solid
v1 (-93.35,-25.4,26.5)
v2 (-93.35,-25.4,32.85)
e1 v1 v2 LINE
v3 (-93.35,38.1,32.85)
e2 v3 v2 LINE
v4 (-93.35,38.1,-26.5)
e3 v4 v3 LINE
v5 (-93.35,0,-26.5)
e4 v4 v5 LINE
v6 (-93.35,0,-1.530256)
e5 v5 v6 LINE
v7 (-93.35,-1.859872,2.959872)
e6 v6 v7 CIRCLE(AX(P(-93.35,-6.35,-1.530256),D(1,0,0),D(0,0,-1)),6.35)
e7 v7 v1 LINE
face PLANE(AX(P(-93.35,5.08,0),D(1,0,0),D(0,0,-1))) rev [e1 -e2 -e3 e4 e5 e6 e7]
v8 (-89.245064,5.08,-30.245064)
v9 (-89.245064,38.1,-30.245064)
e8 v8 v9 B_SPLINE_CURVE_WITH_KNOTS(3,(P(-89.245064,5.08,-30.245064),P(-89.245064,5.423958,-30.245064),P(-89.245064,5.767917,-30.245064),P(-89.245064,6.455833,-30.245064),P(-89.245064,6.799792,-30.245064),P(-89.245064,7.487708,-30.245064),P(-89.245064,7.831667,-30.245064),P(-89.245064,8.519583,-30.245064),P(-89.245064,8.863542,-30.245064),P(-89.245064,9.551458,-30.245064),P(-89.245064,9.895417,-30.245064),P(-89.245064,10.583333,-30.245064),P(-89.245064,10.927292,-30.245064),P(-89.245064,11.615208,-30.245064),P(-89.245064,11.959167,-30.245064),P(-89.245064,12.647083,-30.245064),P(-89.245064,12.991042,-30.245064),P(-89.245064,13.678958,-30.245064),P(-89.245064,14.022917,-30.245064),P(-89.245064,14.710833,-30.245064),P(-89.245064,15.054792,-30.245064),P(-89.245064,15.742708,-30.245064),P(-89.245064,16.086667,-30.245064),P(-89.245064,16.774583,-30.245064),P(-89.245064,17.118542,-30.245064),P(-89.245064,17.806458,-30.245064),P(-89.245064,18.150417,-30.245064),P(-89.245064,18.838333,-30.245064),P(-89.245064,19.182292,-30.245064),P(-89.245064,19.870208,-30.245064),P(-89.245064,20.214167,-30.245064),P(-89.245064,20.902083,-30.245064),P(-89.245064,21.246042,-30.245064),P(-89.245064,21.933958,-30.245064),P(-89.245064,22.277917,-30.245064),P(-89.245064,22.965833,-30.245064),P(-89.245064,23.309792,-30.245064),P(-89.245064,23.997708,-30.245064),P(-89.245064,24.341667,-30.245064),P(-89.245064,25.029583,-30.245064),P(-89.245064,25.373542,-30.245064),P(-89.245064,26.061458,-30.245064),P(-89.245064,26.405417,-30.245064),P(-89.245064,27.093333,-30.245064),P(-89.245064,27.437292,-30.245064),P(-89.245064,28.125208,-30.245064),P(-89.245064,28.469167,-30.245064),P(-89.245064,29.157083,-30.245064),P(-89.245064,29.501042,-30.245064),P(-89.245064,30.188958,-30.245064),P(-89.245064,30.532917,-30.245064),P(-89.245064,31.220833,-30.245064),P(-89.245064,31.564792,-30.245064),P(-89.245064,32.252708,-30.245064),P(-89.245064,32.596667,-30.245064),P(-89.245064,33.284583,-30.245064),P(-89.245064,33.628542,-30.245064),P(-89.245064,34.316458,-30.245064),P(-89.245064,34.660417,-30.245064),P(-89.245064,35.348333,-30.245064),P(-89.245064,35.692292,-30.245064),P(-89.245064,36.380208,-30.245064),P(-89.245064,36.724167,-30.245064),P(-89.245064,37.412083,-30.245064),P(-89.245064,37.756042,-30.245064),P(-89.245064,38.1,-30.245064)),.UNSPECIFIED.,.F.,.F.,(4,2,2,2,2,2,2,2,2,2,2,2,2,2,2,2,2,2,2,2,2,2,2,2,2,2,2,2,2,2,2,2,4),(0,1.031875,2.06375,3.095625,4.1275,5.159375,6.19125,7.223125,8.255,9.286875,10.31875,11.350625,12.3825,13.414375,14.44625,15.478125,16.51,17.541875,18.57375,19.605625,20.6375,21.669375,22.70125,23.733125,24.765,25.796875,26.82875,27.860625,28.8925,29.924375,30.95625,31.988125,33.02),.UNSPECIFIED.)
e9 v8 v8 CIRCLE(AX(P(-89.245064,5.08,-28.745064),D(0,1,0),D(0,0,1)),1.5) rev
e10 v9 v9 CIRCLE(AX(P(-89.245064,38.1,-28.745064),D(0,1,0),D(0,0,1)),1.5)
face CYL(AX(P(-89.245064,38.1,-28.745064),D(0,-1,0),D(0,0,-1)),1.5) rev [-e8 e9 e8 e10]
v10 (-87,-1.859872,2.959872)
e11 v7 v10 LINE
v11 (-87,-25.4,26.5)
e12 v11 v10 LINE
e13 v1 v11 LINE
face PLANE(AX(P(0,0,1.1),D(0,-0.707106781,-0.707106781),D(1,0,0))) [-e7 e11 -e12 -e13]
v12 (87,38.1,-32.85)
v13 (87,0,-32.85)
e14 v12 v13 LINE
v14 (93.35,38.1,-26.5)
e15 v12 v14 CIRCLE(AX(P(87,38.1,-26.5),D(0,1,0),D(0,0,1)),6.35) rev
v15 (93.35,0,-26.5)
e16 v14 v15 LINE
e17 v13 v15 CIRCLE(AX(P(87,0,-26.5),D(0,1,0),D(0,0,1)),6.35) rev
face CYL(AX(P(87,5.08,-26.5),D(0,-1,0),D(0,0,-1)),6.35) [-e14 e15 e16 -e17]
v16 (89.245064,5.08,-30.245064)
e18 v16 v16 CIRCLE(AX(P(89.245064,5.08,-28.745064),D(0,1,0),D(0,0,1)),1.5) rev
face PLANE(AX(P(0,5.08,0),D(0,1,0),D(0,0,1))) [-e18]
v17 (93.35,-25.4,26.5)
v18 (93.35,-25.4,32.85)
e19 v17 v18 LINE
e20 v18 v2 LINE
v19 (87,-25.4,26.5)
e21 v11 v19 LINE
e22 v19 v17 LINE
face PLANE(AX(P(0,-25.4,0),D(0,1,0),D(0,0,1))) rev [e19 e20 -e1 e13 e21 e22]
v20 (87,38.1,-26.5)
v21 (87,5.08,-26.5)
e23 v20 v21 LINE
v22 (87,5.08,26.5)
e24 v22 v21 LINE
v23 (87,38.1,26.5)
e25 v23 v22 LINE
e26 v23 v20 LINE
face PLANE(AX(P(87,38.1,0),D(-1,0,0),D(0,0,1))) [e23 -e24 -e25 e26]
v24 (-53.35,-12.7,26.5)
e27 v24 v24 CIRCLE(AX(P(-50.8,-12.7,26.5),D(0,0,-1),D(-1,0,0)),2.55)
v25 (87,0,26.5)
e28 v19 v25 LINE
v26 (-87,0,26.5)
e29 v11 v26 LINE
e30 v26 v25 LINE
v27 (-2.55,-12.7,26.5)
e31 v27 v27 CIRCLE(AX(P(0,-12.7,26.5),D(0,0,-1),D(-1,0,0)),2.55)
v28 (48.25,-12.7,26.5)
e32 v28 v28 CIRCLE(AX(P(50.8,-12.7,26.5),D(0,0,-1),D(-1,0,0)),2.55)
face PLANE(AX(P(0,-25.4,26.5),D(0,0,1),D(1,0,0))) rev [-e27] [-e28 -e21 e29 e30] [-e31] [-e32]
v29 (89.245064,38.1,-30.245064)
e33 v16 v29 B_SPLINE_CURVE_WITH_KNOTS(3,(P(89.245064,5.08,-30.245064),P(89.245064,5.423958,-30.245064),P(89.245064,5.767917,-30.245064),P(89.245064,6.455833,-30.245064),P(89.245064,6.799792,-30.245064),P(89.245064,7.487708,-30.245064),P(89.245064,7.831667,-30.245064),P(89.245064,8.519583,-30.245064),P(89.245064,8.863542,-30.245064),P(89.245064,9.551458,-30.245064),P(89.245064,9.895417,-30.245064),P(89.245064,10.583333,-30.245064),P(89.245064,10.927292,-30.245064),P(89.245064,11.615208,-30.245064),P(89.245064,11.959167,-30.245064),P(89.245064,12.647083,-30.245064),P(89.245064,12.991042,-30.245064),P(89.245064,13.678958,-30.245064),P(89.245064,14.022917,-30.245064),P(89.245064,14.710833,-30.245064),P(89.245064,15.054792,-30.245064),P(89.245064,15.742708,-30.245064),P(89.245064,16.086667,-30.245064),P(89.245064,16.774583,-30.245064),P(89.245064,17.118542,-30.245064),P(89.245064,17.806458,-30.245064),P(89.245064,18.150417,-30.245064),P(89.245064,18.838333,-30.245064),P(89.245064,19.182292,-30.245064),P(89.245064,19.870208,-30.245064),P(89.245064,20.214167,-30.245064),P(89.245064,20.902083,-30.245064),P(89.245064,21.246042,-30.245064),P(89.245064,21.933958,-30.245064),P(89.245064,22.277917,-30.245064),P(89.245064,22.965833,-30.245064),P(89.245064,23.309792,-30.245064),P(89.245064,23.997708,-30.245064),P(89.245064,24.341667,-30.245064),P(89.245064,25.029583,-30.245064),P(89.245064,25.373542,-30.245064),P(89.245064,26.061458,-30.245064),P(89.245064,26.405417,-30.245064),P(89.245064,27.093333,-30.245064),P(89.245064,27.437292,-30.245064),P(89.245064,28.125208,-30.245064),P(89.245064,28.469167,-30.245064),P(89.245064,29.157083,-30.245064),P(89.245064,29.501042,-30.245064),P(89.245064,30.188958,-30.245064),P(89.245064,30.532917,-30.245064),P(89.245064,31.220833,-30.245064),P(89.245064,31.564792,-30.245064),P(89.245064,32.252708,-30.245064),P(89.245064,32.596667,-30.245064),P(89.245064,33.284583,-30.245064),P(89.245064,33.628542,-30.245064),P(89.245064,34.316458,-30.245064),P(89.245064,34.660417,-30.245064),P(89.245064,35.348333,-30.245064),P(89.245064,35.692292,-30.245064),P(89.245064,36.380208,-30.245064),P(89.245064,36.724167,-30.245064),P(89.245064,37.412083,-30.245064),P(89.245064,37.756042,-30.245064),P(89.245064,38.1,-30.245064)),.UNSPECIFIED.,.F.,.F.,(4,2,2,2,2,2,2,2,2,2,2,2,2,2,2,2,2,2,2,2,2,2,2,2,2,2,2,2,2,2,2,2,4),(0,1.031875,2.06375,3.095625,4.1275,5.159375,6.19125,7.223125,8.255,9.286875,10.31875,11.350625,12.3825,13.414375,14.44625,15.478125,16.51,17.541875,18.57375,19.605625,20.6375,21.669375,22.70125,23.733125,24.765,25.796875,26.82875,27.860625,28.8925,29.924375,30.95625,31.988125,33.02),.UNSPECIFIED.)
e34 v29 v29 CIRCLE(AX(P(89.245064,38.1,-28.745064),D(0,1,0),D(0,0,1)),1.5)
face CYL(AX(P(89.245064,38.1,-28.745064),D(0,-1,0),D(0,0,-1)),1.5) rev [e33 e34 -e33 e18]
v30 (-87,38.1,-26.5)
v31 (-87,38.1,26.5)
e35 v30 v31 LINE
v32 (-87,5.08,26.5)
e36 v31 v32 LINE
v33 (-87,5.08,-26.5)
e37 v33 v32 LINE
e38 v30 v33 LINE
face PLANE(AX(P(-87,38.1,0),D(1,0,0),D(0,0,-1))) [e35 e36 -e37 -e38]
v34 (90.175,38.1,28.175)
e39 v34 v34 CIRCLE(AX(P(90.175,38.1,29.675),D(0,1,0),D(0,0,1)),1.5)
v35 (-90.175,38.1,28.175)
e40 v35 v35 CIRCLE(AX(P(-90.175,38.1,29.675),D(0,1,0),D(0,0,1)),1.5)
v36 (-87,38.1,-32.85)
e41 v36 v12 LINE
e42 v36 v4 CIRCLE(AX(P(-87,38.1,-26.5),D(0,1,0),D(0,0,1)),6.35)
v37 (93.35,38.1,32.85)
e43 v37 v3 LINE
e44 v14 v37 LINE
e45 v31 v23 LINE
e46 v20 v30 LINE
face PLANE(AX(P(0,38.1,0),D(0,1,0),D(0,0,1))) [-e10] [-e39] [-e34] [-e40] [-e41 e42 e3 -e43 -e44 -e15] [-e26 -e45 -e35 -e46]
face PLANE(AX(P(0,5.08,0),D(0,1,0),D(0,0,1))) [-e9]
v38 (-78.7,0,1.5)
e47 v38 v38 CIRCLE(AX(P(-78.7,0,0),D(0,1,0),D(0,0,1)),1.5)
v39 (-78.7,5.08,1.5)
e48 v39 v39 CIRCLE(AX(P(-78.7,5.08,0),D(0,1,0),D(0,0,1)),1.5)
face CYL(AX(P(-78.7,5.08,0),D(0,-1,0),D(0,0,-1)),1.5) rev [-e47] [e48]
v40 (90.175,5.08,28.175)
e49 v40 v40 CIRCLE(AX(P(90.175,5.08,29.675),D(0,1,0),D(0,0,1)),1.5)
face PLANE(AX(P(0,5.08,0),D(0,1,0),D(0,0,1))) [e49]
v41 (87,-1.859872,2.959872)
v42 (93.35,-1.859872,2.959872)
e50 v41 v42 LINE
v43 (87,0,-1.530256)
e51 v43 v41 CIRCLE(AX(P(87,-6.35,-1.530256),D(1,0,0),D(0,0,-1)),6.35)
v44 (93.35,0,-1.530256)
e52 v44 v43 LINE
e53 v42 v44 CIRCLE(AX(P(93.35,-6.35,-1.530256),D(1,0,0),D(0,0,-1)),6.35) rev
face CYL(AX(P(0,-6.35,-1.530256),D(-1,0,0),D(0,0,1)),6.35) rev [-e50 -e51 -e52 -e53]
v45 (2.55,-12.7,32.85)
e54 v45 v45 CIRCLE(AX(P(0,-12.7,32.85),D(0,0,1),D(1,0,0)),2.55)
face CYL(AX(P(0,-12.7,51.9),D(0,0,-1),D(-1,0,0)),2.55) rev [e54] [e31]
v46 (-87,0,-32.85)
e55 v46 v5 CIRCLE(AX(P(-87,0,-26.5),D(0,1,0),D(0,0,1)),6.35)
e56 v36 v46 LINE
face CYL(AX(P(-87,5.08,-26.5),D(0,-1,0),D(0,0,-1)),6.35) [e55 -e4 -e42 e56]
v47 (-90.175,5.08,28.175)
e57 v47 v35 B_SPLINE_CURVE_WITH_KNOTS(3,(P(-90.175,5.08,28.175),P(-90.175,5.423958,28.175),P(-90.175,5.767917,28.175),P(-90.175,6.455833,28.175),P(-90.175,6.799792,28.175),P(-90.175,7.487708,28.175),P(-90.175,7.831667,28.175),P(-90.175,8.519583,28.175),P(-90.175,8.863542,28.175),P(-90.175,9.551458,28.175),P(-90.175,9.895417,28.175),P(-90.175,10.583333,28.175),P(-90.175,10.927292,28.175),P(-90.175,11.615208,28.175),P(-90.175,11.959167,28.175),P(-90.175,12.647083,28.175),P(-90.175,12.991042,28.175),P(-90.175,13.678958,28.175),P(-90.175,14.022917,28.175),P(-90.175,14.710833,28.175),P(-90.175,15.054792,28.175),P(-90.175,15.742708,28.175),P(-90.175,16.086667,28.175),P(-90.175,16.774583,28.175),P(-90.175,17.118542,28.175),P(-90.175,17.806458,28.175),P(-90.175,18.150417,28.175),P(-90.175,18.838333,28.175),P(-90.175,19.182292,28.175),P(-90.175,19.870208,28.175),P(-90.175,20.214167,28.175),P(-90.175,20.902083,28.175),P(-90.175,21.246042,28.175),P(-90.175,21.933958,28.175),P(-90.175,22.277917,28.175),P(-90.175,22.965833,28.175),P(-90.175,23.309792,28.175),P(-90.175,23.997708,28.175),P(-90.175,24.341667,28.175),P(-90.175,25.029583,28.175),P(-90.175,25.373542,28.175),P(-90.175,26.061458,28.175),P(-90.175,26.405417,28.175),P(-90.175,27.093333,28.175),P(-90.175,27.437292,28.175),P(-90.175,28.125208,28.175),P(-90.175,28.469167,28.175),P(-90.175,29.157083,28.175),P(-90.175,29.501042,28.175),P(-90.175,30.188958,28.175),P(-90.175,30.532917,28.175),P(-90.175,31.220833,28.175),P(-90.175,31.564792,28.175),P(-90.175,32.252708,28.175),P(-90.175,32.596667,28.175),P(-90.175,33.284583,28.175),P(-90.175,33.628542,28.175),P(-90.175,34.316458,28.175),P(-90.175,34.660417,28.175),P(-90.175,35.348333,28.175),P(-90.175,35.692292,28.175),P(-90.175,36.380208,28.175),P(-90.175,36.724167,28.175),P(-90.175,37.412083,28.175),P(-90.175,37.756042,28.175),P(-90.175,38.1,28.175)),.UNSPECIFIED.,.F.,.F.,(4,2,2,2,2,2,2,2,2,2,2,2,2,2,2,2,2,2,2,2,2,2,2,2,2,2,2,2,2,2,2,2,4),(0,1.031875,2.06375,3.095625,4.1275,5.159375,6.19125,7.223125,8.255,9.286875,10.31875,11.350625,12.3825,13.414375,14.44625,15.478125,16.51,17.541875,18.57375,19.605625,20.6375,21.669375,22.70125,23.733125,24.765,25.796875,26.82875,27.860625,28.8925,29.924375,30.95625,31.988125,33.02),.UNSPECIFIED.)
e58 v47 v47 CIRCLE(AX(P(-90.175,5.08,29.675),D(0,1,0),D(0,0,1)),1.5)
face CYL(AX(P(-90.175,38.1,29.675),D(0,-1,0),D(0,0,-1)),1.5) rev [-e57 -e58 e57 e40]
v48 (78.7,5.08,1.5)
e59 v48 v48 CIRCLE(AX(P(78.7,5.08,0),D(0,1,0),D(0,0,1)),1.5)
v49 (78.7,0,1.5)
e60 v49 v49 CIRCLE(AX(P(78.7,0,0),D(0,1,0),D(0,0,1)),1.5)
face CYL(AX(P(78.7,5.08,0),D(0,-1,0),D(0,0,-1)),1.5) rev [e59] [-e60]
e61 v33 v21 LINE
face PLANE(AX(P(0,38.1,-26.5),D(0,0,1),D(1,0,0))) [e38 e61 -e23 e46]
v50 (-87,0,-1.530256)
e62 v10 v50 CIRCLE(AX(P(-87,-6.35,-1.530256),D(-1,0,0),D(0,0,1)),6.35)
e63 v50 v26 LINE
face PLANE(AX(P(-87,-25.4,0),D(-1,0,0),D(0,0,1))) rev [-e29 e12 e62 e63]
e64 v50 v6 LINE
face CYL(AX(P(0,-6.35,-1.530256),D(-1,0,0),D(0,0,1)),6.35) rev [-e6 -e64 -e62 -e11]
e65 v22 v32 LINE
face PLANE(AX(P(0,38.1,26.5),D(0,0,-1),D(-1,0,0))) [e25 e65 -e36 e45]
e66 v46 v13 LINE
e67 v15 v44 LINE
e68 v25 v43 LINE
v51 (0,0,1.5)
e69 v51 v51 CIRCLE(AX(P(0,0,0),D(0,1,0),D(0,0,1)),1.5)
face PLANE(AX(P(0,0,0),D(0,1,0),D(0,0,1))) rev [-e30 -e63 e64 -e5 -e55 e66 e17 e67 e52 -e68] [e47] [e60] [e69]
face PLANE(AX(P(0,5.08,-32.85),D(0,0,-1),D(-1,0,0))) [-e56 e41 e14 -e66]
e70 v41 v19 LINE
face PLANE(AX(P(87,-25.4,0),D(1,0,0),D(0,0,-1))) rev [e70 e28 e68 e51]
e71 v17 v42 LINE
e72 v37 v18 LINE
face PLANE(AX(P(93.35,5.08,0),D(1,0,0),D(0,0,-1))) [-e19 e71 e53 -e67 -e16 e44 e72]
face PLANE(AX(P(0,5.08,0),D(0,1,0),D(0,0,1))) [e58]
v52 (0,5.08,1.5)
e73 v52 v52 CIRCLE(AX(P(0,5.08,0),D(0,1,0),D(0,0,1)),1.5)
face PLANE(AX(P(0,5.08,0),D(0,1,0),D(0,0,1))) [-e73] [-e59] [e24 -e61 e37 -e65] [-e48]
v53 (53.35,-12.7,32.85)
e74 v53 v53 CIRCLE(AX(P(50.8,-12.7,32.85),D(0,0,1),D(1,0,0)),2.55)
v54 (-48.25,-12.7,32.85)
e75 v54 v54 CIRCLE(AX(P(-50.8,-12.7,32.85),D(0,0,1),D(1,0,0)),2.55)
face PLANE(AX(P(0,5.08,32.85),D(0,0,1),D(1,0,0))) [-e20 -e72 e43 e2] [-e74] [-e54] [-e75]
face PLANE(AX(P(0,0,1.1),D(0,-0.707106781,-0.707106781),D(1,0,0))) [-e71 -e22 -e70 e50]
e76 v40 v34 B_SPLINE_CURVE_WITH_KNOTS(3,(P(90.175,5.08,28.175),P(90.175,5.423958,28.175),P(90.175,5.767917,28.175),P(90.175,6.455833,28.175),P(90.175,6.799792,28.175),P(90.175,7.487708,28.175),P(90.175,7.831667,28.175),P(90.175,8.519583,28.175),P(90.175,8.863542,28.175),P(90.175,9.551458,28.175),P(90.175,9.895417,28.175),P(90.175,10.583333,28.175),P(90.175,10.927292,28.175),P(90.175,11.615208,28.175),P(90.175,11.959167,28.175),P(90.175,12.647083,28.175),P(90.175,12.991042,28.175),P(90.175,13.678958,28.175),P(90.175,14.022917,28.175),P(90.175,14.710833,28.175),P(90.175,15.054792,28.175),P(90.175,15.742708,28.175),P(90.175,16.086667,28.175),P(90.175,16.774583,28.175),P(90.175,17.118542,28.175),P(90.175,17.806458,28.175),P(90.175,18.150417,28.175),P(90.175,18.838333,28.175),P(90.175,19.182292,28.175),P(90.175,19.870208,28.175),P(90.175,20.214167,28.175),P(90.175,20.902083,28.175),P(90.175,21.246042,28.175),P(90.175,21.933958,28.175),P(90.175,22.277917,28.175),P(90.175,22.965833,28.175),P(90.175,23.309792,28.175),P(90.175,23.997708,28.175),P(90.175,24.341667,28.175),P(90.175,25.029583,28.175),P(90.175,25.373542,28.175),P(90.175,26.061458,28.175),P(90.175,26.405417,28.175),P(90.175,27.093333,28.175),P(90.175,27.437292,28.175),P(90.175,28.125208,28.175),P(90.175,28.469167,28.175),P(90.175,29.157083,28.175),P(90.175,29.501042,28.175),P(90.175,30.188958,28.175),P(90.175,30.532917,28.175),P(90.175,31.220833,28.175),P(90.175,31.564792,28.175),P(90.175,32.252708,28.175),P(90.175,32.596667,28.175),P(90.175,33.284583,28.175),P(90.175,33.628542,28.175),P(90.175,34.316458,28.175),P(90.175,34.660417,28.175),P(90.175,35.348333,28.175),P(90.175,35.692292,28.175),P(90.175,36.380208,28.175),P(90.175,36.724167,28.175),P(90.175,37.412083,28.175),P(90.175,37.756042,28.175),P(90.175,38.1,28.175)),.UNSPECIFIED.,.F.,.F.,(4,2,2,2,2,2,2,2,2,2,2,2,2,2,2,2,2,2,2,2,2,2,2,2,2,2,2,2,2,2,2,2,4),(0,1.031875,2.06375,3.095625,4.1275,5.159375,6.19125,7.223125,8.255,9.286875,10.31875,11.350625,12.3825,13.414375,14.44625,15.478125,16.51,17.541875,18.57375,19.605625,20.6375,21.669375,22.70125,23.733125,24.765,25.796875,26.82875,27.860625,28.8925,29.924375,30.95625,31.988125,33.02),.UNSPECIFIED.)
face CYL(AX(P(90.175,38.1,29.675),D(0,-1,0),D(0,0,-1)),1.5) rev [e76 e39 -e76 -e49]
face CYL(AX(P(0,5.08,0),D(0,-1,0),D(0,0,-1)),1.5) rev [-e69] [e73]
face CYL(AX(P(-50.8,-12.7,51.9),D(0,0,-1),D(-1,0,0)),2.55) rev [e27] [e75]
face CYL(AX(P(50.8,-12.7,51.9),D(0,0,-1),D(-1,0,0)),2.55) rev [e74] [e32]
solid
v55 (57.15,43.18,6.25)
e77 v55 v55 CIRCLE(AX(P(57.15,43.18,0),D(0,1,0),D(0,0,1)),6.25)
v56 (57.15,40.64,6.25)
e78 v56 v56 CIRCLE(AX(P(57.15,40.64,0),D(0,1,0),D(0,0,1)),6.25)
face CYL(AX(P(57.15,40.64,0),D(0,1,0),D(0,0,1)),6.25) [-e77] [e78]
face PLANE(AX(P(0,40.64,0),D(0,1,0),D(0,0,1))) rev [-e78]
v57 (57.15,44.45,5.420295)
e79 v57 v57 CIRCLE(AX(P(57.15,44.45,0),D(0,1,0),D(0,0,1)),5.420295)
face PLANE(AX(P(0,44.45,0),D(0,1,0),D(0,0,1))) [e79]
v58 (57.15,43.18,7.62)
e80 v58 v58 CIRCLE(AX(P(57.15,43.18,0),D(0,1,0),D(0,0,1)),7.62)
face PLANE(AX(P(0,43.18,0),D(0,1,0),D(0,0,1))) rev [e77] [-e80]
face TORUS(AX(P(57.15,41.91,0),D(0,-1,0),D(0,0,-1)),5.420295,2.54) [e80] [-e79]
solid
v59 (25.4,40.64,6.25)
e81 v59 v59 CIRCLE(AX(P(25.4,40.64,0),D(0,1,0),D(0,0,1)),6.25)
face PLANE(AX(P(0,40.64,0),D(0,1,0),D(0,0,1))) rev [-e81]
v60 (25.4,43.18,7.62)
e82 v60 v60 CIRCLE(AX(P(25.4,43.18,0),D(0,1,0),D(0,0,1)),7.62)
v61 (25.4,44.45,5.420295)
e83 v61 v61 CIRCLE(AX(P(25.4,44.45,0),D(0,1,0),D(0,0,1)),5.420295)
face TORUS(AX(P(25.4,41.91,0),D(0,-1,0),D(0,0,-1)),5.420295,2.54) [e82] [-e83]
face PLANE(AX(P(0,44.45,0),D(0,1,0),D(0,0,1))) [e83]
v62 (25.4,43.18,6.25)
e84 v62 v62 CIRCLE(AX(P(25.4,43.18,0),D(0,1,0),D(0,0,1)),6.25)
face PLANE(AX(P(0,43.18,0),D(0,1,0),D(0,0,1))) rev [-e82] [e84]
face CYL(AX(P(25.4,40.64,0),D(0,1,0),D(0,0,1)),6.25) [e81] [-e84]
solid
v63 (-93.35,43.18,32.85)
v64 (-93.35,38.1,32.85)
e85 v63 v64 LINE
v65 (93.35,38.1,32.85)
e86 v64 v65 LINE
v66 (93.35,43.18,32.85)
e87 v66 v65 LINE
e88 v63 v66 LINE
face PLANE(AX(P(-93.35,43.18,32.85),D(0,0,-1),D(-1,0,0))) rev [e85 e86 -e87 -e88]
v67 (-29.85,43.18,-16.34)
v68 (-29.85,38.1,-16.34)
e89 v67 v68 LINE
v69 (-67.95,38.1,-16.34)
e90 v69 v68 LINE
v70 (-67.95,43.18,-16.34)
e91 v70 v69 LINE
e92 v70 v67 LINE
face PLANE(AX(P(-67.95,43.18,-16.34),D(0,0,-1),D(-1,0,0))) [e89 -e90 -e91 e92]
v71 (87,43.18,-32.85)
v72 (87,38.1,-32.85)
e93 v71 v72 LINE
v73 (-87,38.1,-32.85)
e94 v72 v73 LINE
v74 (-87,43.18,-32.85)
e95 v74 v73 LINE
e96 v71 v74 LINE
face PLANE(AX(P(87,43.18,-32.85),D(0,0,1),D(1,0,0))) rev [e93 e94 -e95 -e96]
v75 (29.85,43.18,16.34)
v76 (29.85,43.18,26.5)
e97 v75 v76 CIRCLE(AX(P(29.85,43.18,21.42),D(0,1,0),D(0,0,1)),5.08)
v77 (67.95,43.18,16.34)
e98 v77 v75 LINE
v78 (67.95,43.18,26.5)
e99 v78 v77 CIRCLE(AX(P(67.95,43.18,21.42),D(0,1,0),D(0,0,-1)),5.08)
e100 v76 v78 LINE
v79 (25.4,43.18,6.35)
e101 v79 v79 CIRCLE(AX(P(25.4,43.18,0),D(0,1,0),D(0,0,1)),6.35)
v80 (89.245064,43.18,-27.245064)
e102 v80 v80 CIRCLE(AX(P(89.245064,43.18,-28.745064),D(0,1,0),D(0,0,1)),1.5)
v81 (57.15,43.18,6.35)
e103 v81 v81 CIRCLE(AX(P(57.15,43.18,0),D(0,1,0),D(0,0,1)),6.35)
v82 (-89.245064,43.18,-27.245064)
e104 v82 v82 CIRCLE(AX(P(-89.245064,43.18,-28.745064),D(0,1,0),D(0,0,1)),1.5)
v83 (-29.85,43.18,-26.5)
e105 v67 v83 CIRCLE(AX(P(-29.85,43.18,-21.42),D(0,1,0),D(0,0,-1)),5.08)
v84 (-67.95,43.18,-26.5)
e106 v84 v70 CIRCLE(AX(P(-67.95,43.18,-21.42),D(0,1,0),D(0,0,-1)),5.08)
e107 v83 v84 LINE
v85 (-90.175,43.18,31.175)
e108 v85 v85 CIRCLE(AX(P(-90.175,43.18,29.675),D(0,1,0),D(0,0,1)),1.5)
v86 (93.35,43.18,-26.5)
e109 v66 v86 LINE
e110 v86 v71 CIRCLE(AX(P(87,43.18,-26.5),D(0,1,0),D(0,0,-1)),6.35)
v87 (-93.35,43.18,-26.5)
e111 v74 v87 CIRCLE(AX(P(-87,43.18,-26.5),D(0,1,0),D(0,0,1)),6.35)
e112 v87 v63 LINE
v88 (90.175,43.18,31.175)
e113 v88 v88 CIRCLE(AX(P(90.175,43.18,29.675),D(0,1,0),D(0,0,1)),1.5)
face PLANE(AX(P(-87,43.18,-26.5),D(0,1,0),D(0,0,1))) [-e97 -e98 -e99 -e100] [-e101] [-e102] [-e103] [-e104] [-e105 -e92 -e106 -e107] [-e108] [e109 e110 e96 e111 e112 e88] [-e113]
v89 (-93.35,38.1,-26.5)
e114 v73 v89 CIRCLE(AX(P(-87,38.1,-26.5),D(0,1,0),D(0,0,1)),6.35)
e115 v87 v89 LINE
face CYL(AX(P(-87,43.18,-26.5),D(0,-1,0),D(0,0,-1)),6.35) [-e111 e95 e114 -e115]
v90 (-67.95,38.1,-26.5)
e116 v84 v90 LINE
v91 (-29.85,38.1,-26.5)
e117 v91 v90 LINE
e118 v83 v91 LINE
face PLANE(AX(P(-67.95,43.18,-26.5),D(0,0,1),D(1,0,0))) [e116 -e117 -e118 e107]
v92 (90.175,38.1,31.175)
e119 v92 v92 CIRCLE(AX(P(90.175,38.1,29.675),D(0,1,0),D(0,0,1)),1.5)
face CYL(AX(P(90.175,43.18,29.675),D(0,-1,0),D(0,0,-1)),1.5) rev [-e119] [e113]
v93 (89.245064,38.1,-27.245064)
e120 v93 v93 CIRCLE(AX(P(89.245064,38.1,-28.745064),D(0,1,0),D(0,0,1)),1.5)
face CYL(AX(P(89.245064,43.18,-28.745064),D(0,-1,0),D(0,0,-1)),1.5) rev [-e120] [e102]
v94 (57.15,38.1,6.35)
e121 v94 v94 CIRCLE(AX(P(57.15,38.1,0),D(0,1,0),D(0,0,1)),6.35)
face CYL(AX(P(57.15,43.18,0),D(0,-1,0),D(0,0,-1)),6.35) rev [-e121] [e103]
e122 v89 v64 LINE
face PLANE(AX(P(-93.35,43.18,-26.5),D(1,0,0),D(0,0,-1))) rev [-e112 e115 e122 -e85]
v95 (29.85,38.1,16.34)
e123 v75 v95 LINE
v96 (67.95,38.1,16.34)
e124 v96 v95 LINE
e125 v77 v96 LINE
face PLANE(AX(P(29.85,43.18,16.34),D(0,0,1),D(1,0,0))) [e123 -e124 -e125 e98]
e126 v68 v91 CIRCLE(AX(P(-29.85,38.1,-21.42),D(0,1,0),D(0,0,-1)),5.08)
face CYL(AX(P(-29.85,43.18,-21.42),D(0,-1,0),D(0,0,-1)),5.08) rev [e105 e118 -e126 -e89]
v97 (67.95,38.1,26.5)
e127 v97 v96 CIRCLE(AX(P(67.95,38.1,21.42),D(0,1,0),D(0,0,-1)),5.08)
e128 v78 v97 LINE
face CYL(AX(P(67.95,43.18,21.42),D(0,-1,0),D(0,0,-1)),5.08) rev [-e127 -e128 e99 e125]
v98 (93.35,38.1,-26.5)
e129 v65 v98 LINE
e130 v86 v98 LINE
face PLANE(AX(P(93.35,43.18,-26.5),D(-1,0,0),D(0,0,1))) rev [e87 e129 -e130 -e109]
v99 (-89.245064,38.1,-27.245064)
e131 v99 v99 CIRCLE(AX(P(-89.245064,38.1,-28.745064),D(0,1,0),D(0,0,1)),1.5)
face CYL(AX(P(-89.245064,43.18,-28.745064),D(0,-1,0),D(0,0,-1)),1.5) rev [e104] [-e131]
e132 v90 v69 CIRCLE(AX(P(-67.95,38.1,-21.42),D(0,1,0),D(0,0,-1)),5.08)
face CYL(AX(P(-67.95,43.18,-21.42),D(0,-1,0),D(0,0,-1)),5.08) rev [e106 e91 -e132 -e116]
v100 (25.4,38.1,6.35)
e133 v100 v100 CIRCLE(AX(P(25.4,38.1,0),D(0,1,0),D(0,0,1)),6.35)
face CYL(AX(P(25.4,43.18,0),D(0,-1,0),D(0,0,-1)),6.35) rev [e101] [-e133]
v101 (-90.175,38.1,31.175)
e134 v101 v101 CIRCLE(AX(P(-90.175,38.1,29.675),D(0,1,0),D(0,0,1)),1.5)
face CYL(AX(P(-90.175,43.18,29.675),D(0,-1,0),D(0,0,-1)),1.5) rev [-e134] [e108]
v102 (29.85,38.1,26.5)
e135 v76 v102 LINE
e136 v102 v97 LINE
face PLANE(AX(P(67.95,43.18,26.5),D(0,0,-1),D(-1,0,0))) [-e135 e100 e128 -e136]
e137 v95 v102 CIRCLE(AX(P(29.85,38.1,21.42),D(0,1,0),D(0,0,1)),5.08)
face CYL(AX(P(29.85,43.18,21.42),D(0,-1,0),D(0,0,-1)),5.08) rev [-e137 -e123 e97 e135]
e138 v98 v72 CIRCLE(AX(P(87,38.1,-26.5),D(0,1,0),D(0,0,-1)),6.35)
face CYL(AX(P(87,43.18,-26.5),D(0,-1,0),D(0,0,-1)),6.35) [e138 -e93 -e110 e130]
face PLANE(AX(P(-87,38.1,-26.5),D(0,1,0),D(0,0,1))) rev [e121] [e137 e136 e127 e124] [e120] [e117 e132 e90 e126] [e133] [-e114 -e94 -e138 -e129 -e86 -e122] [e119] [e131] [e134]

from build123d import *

# Parameters (mm, degrees)
SKETCH1_R             = 1.5
BOSS_EXTRUDE1_DEPTH   = 5.08
SKETCH1_3_R           = 1.5
SKETCH1_3_W           = 174
SKETCH1_3_H           = 53
BOSS_EXTRUDE2_DEPTH   = 38.1
SKETCH3_R             = 1.5
SKETCH3_R_2           = 6.35
BOSS_EXTRUDE4_DEPTH   = 5.08
BOSS_EXTRUDE5_DEPTH   = 25.4
CHAMFER1_SIZE         = 25.4
SKETCH7_R             = 2.55
CUT_EXTRUDE2_DEPTH    = 25.4
SKETCH8_R             = 6.249999997
BOSS_EXTRUDE6_DEPTH   = 2.54
BOSS_EXTRUDE6_2_DEPTH = 2.54
SKETCH8_4_R           = 7.62
SKETCH8_4_R_2         = 6.35
SKETCH8_4_R_3         = 6.249999997
BOSS_EXTRUDE7_DEPTH   = 1.27
FILLET1_R             = 2.54
FILLET2_R             = 2.54
FILLET3_START         = -93.35
FILLET3_DEPTH         = 6.35
FILLET3_START_2       = 87
FILLET3_2_DEPTH       = 6.35


with BuildPart() as part:
    # Sketch1 → Boss-Extrude1 (new body)
    with BuildSketch(Plane(origin=(0, 0, 0), x_dir=(1, 0, 0), z_dir=(0, 1, 0))):
        with BuildLine():
            Line((87, 32.85), (-87, 32.85))
            ThreePointArc((-87, 32.85), (-91.490128061, 30.990128061), (-93.35, 26.5))
            Line((-93.35, 26.5), (-93.35, -1.1))
            Line((-93.35, -1.1), (-87, -1.1))
            Line((-87, -1.1), (-87, -26.5))
            Line((-87, -26.5), (-89.114339828, -28.614339828))
            ThreePointArc((-89.114339828, -28.614339828), (-91.235660172, -28.614339828), (-91.235660172, -30.735660172))
            Line((-91.235660172, -30.735660172), (-93.35, -32.85))
            Line((-93.35, -32.85), (93.35, -32.85))
            Line((93.35, -32.85), (91.235660172, -30.735660172))
            ThreePointArc((91.235660172, -30.735660172), (91.235660172, -28.614339828), (89.114339828, -28.614339828))
            Line((89.114339828, -28.614339828), (87, -26.5))
            Line((87, -26.5), (87, -1.1))
            Line((87, -1.1), (93.35, -1.1))
            Line((93.35, -1.1), (93.35, 26.5))
            ThreePointArc((93.35, 26.5), (91.490128061, 30.990128061), (87, 32.85))
        make_face()
        with Locations(Location((-78.7, 0, 0), (0, 0, 270))):
            Circle(SKETCH1_R, mode=Mode.SUBTRACT)
        with Locations(Location((0, 0, 0), (0, 0, 270))):
            Circle(SKETCH1_R, mode=Mode.SUBTRACT)
        with Locations(Location((78.7, 0, 0), (0, 0, 270))):
            Circle(SKETCH1_R, mode=Mode.SUBTRACT)
    extrude(amount=BOSS_EXTRUDE1_DEPTH)

    # Sketch1<3> → Boss-Extrude2 (add)
    with BuildSketch(Plane(origin=(0, 0, 0), x_dir=(1, 0, 0), z_dir=(0, 1, 0))):
        with BuildLine():
            Line((-87, 32.85), (87, 32.85))
            ThreePointArc((87, 32.85), (91.490128061, 30.990128061), (93.35, 26.5))
            Line((93.35, 26.5), (93.35, -32.85))
            Line((93.35, -32.85), (-93.35, -32.85))
            Line((-93.35, -32.85), (-93.35, 26.5))
            ThreePointArc((-93.35, 26.5), (-91.490128061, 30.990128061), (-87, 32.85))
        make_face()
        with Locations(Location((-89.24506403, 28.74506403, 0), (0, 0, 90))):
            Circle(SKETCH1_3_R, mode=Mode.SUBTRACT)
        with Locations(Location((89.24506403, 28.74506403, 0), (0, 0, 90))):
            Circle(SKETCH1_3_R, mode=Mode.SUBTRACT)
        with Locations(Location((90.175, -29.675, 0), (0, 0, 90))):
            Circle(SKETCH1_3_R, mode=Mode.SUBTRACT)
        with Locations(Location((-90.175, -29.675, 0), (0, 0, 90))):
            Circle(SKETCH1_3_R, mode=Mode.SUBTRACT)
        Rectangle(SKETCH1_3_W, SKETCH1_3_H, mode=Mode.SUBTRACT)
    extrude(amount=BOSS_EXTRUDE2_DEPTH)

    # Sketch1<4> → Boss-Extrude5 (add)
    with BuildSketch(Plane(origin=(0, 0, 0), x_dir=(1, 0, 0), z_dir=(0, 1, 0))):
        Polygon((-87, -26.5), (-87, -1.1), (-93.35, -1.1), (-93.35, -32.85), (93.35, -32.85), (93.35, -1.1), (87, -1.1), (87, -26.5), align=None)
    extrude(amount=-BOSS_EXTRUDE5_DEPTH)

    # Chamfer1
    chamfer1_edges = [part.edges().sort_by_distance(p)[0] for p in [
        (-90.175, -25.4, 1.1),
        (90.175, -25.4, 1.1),
    ]]
    chamfer(chamfer1_edges, length=CHAMFER1_SIZE - 0.0001)  # a hair under: the kernel refuses the full size

    # Sketch7 → Cut-Extrude2 (cut)
    with BuildSketch(Plane(origin=(0, 0, 26.5), x_dir=(-1, 0, 0), z_dir=(0, 0, -1))):
        with Locations((-50.8, -12.7)):
            Circle(SKETCH7_R)
        with Locations((0, -12.7)):
            Circle(SKETCH7_R)
        with Locations((50.8, -12.7)):
            Circle(SKETCH7_R)
    extrude(amount=-CUT_EXTRUDE2_DEPTH, mode=Mode.SUBTRACT)

    # Fillet3: read off the stored shape, not the designer's step
    # Fillet3 outline → Fillet3 (add)
    with BuildSketch(Plane.YZ.offset(FILLET3_START)):
        with BuildLine():
            Line((0, 1.1), (-1.859871939, 2.959871939))
            ThreePointArc((-1.859871939, 2.959871939), (-0.483364969, 0.899783674), (0, -1.530256121))
            Line((0, -1.530256121), (0, 1.1))
        make_face()
    extrude(amount=FILLET3_DEPTH)

    # Fillet3 2 outline → Fillet3 2 (add)
    with BuildSketch(Plane.YZ.offset(FILLET3_START_2)):
        with BuildLine():
            Line((0, 1.1), (-1.859871939, 2.959871939))
            ThreePointArc((-1.859871939, 2.959871939), (-0.483364969, 0.899783674), (0, -1.530256121))
            Line((0, -1.530256121), (0, 1.1))
        make_face()
    extrude(amount=FILLET3_2_DEPTH)


with BuildPart() as body_2:
    # Sketch3 → Boss-Extrude4 (new body)
    with BuildSketch(Plane(origin=(0, 38.1, 0), x_dir=(1, 0, 0), z_dir=(0, 1, 0))):
        with BuildLine():
            Line((87, 32.85), (-87, 32.85))
            ThreePointArc((-87, 32.85), (-91.490128061, 30.990128061), (-93.35, 26.5))
            Line((-93.35, 26.5), (-93.35, -32.85))
            Line((-93.35, -32.85), (93.35, -32.85))
            Line((93.35, -32.85), (93.35, 26.5))
            ThreePointArc((93.35, 26.5), (91.490128061, 30.990128061), (87, 32.85))
        make_face()
        with Locations(Location((-89.24506403, 28.74506403, 0), (0, 0, 270))):
            Circle(SKETCH3_R, mode=Mode.SUBTRACT)
        with Locations(Location((89.24506403, 28.74506403, 0), (0, 0, 270))):
            Circle(SKETCH3_R, mode=Mode.SUBTRACT)
        with Locations(Location((90.175, -29.675, 0), (0, 0, 270))):
            Circle(SKETCH3_R, mode=Mode.SUBTRACT)
        with Locations(Location((-90.175, -29.675, 0), (0, 0, 270))):
            Circle(SKETCH3_R, mode=Mode.SUBTRACT)
        with Locations(Location((25.4, 0, 0), (0, 0, 270))):
            Circle(SKETCH3_R_2, mode=Mode.SUBTRACT)
        with Locations(Location((57.15, 0, 0), (0, 0, 270))):
            Circle(SKETCH3_R_2, mode=Mode.SUBTRACT)
        with BuildLine():
            Line((-67.95, 16.34), (-29.85, 16.34))
            ThreePointArc((-29.85, 16.34), (-24.77, 21.42), (-29.85, 26.5))
            Line((-29.85, 26.5), (-67.95, 26.5))
            ThreePointArc((-67.95, 26.5), (-73.03, 21.42), (-67.95, 16.34))
        make_face(mode=Mode.SUBTRACT)
        with BuildLine():
            Line((67.95, -26.5), (29.85, -26.5))
            ThreePointArc((29.85, -26.5), (24.77, -21.42), (29.85, -16.34))
            Line((29.85, -16.34), (67.95, -16.34))
            ThreePointArc((67.95, -16.34), (73.03, -21.42), (67.95, -26.5))
        make_face(mode=Mode.SUBTRACT)
    extrude(amount=BOSS_EXTRUDE4_DEPTH)


with BuildPart() as body_3:
    # Sketch8 → Boss-Extrude6 (new body)
    with BuildSketch(Plane(origin=(0, 43.18, 0), x_dir=(1, 0, 0), z_dir=(0, 1, 0))):
        with Locations(Location((25.4, 0, 0), (0, 0, 270))):
            Circle(SKETCH8_R)
    extrude(amount=-BOSS_EXTRUDE6_DEPTH)



with BuildPart() as body_4:
    # Sketch8 → Boss-Extrude6 2 (new body)
    with BuildSketch(Plane(origin=(0, 43.18, 0), x_dir=(1, 0, 0), z_dir=(0, 1, 0))):
        with Locations(Location((57.15, 0, 0), (0, 0, 270))):
            Circle(SKETCH8_R)
    extrude(amount=-BOSS_EXTRUDE6_2_DEPTH)


with BuildPart() as body_3_1:
    add(body_3.part)

    add(body_4.part)  # Boss-Extrude7 merges body 4
    # Sketch8<4> → Boss-Extrude7 (add)
    # profile 1 of 6: a face of its own
    with BuildSketch(Plane(origin=(0, 43.18, 0), x_dir=(1, 0, 0), z_dir=(0, 1, 0))):
        with Locations(Location((25.4, 0, 0), (0, 0, 270))):
            Circle(SKETCH8_4_R)
        with Locations(Location((25.4, 0, 0), (0, 0, 270))):
            Circle(SKETCH8_4_R_2, mode=Mode.SUBTRACT)
    # profile 2 of 6: a face of its own
    with BuildSketch(Plane(origin=(0, 43.18, 0), x_dir=(1, 0, 0), z_dir=(0, 1, 0))):
        with Locations(Location((57.15, 0, 0), (0, 0, 270))):
            Circle(SKETCH8_4_R)
        with Locations(Location((57.15, 0, 0), (0, 0, 270))):
            Circle(SKETCH8_4_R_2, mode=Mode.SUBTRACT)
    # profile 3 of 6: a face of its own
    with BuildSketch(Plane(origin=(0, 43.18, 0), x_dir=(1, 0, 0), z_dir=(0, 1, 0))):
        with Locations(Location((25.4, 0, 0), (0, 0, 270))):
            Circle(SKETCH8_4_R_2)
        with Locations(Location((25.4, 0, 0), (0, 0, 270))):
            Circle(SKETCH8_4_R_3, mode=Mode.SUBTRACT)
    # profile 4 of 6: a face of its own
    with BuildSketch(Plane(origin=(0, 43.18, 0), x_dir=(1, 0, 0), z_dir=(0, 1, 0))):
        with Locations(Location((25.4, 0, 0), (0, 0, 270))):
            Circle(SKETCH8_4_R_3)
    # profile 5 of 6: a face of its own
    with BuildSketch(Plane(origin=(0, 43.18, 0), x_dir=(1, 0, 0), z_dir=(0, 1, 0))):
        with Locations(Location((57.15, 0, 0), (0, 0, 270))):
            Circle(SKETCH8_4_R_2)
        with Locations(Location((57.15, 0, 0), (0, 0, 270))):
            Circle(SKETCH8_4_R_3, mode=Mode.SUBTRACT)
    # profile 6 of 6: a face of its own
    with BuildSketch(Plane(origin=(0, 43.18, 0), x_dir=(1, 0, 0), z_dir=(0, 1, 0))):
        with Locations(Location((57.15, 0, 0), (0, 0, 270))):
            Circle(SKETCH8_4_R_3)
    extrude(amount=BOSS_EXTRUDE7_DEPTH)

    # Fillet1
    # the kernel refuses this fillet: 2.54 mm, written as the material it takes off along each edge
    with BuildSketch(Plane(origin=(25.4, 44.45, 0), x_dir=(0, 0, 1), z_dir=(-1, 0, 0))) as fillet1_piece_1:
        with BuildLine():
            CenterArc((5.420295474, -2.54), FILLET1_R, 30, 60)
            Line((5.420295474, 0), (5.420295474, 0.0508))
            Line((5.420295474, 0.0508), (7.62, 0.0508))
            Line((7.62, 0.0508), (7.6708, 0))
            ThreePointArc((7.6708, 0), (7.6708, -0.635), (7.663994091, -1.2446))
            Line((7.663994091, -1.2446), (7.62, -1.27))
        make_face()
    revolve(axis=Axis((25.4, 44.45, 0), (0, 1, 0)), mode=Mode.SUBTRACT)

    # Fillet2
    # the kernel refuses this fillet: 2.54 mm, written as the material it takes off along each edge
    with BuildSketch(Plane(origin=(57.15, 44.45, 0), x_dir=(0, 0, 1), z_dir=(-1, 0, 0))) as fillet2_piece_1:
        with BuildLine():
            CenterArc((5.420295474, -2.54), FILLET2_R, 30, 60)
            Line((5.420295474, 0), (5.420295474, 0.0508))
            Line((5.420295474, 0.0508), (7.62, 0.0508))
            Line((7.62, 0.0508), (7.6708, 0))
            ThreePointArc((7.6708, 0), (7.6708, -0.635), (7.663994091, -1.2446))
            Line((7.663994091, -1.2446), (7.62, -1.27))
        make_face()
    revolve(axis=Axis((57.15, 44.45, 0), (0, 1, 0)), mode=Mode.SUBTRACT)


solid = Compound([part.part, body_2.part, body_3_1.part])
